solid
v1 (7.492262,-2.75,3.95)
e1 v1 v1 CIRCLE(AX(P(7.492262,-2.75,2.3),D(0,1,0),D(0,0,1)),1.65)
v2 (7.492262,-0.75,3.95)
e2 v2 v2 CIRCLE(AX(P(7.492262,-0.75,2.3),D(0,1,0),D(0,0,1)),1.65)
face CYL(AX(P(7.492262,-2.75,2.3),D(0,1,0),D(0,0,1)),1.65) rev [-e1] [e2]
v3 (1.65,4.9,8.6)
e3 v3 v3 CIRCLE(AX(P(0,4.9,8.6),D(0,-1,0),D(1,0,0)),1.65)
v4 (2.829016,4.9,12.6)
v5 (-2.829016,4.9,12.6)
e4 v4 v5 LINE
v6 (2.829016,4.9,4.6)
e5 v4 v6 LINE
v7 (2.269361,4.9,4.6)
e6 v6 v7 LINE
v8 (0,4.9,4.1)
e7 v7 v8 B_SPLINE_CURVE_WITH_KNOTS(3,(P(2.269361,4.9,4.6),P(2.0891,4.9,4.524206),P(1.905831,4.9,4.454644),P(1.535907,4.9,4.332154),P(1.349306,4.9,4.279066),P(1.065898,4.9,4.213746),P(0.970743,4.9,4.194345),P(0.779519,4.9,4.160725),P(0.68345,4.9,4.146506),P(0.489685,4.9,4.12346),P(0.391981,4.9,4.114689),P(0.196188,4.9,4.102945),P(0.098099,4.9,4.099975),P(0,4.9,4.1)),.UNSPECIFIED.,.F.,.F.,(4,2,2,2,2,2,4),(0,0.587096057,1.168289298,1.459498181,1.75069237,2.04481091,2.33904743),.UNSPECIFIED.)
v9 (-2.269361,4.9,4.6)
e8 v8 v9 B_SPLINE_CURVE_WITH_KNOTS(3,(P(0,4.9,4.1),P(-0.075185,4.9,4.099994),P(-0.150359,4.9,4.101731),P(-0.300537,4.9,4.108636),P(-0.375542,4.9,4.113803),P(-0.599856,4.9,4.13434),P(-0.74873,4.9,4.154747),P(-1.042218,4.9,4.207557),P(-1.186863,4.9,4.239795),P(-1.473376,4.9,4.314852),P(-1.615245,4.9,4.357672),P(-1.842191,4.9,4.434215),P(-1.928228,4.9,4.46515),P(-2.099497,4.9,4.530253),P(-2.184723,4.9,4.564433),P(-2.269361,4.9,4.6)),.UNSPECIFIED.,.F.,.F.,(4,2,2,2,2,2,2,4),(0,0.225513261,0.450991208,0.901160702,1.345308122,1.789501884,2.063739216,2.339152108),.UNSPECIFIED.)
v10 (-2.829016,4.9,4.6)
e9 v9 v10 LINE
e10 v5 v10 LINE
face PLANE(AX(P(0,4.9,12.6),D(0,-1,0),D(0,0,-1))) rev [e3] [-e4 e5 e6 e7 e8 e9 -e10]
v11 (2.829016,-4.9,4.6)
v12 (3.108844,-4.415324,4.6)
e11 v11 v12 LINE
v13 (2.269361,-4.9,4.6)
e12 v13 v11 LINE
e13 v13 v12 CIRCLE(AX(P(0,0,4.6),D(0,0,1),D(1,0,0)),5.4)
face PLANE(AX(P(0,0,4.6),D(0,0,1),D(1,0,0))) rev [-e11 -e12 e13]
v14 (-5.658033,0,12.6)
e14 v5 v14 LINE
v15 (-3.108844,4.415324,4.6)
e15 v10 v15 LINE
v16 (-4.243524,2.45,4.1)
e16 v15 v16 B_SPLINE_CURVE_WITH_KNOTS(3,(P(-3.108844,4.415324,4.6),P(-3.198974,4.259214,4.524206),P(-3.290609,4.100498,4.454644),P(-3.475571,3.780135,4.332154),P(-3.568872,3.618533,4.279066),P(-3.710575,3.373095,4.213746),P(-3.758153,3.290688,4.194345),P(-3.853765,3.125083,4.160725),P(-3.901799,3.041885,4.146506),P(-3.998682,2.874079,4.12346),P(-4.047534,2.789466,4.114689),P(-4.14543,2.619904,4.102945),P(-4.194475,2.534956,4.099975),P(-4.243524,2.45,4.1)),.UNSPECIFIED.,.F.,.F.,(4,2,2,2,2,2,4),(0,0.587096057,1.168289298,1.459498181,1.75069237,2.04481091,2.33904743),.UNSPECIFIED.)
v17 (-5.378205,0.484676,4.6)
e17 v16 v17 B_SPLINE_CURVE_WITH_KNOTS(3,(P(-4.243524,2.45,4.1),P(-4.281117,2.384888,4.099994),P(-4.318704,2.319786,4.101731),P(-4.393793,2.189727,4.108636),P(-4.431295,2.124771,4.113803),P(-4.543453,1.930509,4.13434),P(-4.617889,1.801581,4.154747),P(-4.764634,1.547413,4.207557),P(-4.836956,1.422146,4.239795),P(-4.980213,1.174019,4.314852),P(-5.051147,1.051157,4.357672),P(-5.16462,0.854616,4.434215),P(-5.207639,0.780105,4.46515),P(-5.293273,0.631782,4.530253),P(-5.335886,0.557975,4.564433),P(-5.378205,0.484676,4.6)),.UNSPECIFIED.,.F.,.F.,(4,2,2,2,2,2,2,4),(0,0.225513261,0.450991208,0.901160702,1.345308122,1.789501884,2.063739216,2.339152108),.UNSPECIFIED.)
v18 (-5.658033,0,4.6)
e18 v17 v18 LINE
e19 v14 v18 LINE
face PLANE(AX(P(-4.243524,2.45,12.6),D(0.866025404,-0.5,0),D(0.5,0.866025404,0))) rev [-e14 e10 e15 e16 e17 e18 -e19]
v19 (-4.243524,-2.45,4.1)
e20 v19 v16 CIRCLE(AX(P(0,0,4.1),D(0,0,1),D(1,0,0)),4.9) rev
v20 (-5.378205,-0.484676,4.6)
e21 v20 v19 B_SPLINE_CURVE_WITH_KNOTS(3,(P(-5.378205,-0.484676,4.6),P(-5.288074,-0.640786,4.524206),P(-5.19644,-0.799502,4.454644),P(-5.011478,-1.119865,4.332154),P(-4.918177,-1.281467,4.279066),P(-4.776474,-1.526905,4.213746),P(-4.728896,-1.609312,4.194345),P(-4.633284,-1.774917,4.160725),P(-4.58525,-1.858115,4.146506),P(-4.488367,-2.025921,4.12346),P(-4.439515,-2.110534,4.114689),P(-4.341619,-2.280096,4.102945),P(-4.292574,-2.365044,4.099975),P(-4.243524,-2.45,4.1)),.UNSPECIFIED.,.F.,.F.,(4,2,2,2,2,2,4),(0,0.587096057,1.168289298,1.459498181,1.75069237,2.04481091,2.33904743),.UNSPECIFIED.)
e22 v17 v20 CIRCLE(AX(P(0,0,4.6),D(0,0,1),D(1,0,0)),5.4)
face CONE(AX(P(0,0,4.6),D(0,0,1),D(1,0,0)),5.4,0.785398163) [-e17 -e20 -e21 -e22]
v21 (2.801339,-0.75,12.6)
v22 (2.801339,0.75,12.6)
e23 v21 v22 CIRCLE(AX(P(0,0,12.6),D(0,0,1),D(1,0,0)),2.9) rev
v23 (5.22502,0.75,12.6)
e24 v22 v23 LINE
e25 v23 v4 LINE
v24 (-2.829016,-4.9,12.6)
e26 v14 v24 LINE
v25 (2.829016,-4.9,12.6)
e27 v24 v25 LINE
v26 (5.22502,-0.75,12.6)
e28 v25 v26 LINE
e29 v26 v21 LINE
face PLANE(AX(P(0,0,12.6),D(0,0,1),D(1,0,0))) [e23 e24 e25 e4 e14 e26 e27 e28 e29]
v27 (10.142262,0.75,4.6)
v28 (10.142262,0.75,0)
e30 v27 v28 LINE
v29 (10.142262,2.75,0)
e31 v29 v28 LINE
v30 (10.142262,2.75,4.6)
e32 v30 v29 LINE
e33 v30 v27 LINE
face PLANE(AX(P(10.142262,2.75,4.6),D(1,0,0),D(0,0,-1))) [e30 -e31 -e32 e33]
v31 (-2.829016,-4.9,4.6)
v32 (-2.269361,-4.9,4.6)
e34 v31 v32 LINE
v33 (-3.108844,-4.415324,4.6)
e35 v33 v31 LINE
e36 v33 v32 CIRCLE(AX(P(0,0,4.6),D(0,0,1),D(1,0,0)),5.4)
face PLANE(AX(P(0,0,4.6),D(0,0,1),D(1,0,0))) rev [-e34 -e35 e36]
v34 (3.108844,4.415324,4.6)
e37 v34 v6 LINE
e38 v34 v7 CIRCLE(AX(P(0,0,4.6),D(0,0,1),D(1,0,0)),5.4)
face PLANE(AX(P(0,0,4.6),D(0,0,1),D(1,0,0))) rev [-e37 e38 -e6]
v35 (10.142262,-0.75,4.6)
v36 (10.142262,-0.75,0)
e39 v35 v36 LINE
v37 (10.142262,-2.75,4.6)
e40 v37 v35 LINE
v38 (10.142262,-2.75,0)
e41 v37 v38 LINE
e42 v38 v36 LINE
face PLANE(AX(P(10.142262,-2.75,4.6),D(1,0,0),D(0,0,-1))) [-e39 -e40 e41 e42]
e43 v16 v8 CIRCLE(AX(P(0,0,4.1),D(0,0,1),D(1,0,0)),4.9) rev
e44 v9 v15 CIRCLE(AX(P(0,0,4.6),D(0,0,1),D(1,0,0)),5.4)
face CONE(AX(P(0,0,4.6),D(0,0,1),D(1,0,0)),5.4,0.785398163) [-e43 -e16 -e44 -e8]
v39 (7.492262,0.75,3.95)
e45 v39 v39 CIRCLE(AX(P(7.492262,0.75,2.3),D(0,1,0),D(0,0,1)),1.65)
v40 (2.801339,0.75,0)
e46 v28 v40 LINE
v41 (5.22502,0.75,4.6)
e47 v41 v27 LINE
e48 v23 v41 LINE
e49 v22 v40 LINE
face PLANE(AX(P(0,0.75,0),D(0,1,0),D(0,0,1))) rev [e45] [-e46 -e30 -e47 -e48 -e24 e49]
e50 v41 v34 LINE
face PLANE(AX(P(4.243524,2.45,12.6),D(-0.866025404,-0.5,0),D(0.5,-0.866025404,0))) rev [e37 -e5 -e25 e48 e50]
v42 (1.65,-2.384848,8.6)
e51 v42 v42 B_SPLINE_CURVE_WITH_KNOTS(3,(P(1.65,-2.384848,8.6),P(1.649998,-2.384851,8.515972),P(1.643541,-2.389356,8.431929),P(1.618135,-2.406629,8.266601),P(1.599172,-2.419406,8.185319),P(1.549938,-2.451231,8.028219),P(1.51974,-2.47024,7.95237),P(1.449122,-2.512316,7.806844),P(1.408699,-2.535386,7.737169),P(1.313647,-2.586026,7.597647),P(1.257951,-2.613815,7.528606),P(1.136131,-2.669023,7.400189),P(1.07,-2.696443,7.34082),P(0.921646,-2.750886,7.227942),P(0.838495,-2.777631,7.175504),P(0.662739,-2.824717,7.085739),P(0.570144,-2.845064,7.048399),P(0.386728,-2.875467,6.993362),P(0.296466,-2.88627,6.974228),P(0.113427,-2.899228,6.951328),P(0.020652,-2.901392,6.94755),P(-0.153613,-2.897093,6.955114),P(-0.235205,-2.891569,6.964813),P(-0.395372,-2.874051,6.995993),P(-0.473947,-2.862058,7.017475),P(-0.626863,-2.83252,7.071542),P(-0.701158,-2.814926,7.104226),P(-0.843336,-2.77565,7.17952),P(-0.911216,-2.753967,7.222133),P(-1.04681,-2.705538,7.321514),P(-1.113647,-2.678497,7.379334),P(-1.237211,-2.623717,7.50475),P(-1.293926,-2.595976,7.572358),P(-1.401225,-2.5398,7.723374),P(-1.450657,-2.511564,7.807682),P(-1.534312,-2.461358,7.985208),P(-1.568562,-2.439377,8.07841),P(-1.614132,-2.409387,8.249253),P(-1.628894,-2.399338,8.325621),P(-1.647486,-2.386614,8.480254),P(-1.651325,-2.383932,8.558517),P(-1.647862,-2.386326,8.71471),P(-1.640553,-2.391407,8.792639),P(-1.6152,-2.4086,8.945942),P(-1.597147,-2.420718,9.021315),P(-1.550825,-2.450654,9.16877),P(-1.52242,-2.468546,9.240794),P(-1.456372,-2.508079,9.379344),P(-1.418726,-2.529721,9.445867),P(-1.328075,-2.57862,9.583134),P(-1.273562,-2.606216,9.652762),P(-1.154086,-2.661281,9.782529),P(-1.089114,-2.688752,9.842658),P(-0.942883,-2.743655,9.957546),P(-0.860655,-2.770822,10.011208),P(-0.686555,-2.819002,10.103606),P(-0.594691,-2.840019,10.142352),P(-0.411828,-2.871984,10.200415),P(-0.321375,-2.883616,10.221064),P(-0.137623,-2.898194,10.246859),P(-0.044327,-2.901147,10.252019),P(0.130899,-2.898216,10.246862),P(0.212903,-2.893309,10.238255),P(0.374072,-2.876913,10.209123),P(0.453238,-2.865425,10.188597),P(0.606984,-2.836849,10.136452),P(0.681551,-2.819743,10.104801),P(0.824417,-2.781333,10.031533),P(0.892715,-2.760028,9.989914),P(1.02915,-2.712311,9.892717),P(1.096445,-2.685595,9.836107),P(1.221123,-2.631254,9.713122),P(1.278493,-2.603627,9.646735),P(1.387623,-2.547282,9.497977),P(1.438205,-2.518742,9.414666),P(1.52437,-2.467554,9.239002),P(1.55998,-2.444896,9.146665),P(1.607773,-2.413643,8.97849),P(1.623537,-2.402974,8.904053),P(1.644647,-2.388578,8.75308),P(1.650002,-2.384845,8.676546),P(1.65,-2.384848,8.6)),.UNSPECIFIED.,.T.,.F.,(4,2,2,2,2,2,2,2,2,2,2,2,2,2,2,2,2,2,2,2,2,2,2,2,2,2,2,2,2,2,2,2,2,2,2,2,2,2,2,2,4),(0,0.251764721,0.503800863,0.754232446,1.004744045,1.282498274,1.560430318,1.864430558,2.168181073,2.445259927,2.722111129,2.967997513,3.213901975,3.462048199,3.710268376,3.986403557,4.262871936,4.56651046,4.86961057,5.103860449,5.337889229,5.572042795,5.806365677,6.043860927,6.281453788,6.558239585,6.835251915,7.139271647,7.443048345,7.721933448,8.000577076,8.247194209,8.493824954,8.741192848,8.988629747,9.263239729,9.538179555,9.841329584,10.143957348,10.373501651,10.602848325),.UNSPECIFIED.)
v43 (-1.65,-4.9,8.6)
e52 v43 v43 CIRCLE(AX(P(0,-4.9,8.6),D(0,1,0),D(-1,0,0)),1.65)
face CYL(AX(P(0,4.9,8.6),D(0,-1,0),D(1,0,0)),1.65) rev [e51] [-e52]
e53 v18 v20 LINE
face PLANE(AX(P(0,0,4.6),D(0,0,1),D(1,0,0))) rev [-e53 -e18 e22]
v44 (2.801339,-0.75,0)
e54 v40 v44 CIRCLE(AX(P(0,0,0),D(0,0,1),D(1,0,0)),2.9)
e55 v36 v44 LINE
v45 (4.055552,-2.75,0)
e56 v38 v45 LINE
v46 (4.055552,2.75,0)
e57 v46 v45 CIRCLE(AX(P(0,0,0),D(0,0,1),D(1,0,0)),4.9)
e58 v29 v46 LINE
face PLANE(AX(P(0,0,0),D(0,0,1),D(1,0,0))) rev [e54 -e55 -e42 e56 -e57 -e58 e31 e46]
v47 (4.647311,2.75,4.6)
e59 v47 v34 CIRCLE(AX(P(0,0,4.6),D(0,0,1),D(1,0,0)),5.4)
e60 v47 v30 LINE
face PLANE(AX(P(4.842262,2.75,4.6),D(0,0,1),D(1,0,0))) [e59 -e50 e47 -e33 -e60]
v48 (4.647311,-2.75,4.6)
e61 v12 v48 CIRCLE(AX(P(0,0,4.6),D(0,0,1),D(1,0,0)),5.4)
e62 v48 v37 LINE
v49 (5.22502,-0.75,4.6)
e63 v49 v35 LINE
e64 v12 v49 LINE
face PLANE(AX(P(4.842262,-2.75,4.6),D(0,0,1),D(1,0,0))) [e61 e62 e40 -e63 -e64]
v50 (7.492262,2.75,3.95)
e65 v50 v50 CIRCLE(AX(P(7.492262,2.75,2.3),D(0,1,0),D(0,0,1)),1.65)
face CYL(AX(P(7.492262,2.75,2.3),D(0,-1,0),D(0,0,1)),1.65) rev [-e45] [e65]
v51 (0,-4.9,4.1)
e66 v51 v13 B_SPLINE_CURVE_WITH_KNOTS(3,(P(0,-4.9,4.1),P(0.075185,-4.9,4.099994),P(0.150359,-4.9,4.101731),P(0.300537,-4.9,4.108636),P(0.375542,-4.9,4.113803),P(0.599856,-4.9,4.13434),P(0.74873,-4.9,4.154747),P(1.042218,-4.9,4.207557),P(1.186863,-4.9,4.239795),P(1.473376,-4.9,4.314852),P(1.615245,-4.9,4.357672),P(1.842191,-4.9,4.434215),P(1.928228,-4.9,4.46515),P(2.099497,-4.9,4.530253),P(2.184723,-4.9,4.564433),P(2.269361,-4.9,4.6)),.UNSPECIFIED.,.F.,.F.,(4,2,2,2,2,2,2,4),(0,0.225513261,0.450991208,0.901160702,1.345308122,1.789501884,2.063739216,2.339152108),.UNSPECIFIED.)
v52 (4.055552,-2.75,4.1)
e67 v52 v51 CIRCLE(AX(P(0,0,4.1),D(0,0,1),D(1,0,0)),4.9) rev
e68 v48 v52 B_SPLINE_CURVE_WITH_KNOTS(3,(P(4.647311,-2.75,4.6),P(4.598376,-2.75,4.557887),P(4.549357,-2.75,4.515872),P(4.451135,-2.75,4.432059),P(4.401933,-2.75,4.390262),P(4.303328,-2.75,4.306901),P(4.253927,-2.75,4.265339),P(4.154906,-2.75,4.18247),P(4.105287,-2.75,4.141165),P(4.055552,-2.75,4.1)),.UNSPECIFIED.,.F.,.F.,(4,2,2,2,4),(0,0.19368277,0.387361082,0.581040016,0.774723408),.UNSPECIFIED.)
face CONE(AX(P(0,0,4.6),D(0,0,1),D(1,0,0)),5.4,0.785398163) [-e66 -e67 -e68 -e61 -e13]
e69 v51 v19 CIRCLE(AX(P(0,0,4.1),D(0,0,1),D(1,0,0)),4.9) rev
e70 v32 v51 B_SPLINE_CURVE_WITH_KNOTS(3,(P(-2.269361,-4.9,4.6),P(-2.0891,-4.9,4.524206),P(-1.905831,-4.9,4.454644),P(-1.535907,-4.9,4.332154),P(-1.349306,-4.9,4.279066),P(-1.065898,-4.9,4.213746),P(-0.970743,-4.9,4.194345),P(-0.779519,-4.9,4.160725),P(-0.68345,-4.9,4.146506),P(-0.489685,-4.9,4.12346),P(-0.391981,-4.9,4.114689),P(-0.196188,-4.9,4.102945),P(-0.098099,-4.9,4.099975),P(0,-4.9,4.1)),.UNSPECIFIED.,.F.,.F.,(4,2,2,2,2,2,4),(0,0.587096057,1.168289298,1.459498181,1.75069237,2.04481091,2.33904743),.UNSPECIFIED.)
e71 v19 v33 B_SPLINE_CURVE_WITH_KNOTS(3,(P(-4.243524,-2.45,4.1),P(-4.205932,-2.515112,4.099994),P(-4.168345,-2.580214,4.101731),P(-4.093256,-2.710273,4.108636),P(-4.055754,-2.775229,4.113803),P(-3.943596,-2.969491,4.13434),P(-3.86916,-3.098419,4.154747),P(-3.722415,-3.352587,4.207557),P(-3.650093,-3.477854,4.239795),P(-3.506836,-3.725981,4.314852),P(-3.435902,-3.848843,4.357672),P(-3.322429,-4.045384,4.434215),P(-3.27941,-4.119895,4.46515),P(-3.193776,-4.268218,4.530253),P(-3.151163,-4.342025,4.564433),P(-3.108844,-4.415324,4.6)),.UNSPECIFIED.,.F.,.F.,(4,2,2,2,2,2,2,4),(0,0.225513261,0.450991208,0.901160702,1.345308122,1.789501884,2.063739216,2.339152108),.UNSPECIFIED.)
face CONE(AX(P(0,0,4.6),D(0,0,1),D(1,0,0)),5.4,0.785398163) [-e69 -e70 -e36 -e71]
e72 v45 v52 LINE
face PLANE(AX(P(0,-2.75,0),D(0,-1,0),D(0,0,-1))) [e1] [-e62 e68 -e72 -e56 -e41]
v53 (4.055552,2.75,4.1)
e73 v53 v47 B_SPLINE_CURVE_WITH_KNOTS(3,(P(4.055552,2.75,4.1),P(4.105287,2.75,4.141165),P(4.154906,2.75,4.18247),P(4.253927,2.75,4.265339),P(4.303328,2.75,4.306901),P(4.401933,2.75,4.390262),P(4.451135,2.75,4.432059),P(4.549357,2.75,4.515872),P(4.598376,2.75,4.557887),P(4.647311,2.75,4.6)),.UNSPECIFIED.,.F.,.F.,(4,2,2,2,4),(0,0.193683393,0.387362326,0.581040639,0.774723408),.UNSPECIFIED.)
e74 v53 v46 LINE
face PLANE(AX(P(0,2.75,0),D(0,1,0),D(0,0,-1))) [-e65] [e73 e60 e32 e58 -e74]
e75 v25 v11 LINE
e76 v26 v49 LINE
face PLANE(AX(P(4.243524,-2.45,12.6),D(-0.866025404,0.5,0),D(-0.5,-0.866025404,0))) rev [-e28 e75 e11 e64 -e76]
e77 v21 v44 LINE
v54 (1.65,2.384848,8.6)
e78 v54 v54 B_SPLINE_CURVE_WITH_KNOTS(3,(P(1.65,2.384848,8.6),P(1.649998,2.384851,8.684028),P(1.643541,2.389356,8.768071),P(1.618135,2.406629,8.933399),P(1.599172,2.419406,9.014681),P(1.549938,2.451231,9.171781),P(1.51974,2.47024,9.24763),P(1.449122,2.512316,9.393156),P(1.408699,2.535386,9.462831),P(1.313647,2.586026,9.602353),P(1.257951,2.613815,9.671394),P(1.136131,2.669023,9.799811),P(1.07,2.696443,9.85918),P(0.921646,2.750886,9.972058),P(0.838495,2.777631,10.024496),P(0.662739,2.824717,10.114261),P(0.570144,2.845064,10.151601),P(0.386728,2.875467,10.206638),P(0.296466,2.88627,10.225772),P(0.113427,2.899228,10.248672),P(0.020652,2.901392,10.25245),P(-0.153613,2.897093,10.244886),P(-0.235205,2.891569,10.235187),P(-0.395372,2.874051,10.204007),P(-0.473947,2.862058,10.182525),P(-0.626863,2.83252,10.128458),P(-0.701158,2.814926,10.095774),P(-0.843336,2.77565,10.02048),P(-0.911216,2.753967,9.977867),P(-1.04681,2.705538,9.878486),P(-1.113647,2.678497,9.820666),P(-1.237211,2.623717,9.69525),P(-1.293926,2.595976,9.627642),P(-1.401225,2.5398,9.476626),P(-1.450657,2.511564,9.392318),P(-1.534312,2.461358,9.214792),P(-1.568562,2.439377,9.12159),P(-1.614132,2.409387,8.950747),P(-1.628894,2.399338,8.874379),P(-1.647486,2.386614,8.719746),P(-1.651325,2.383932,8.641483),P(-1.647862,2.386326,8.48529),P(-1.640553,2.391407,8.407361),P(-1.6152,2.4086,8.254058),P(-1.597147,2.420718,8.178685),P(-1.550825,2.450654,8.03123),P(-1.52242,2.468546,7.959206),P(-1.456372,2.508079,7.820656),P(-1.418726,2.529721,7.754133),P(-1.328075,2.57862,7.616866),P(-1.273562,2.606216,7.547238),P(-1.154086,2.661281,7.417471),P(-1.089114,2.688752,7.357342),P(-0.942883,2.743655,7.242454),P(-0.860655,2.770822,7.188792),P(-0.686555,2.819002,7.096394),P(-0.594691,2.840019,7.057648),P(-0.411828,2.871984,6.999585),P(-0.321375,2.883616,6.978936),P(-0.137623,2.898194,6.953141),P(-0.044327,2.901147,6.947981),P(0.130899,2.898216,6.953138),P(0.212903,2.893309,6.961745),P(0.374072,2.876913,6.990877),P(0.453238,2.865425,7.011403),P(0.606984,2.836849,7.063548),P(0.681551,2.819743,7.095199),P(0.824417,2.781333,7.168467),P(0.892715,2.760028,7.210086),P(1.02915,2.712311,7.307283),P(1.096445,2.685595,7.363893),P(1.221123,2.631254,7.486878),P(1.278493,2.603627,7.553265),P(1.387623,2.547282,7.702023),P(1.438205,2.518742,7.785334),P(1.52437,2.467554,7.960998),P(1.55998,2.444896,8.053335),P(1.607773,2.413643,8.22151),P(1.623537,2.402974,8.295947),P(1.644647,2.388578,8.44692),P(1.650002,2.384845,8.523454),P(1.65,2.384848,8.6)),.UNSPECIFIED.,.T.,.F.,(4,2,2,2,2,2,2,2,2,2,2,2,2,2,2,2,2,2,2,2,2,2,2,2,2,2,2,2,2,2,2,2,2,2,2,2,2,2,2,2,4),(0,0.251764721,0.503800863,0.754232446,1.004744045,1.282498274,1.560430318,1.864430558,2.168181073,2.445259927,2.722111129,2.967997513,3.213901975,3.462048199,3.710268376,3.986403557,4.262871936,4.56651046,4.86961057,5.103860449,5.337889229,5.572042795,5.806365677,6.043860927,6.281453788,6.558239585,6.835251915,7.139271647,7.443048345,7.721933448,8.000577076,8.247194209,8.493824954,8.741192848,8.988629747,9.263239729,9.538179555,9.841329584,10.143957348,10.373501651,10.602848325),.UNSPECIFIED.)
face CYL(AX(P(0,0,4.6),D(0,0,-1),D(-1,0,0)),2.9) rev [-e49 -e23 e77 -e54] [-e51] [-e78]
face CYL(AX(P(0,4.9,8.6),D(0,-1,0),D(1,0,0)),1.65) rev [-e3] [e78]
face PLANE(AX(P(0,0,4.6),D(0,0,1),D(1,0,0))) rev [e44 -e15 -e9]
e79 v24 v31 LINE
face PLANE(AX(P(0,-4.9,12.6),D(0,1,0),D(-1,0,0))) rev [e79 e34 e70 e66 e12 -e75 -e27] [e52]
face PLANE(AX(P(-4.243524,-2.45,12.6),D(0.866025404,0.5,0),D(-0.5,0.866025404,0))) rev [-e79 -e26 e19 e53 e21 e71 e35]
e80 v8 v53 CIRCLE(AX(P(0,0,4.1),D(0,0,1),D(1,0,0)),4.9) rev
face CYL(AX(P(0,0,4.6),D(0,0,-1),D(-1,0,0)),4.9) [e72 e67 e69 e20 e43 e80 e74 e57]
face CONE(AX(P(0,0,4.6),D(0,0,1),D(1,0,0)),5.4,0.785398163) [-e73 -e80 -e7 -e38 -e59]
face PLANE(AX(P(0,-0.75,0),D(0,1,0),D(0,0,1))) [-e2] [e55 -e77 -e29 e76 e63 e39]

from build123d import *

# Parameters (mm, degrees)
CROQUIS1_R                 = 4.9
CROQUIS1_R_2               = 2.9
SALIENTE_EXTRUIR1_DEPTH    = 4.6
CORTAR_EXTRUIR2_DEPTH      = 0.75
CORTAR_EXTRUIR2_DEPTH_BACK = 0.75
CROQUIS2_W                 = 2.8
CROQUIS2_H                 = 4.6
CROQUIS4_R                 = 1.65
SALIENTE_EXTRUIR2_DEPTH    = 2
SALIENTE_EXTRUIR3_DEPTH    = 8
CORTAR_EXTRUIR3_DEPTH      = 19.912045786
CORTAR_EXTRUIR3_DEPTH_BACK = 19.912045786
CROQUIS6_R                 = 1.65
CHAFL_N1_SIZE              = 0.5


with BuildPart() as part:
    # Croquis1 → Saliente-Extruir1 (new body)
    with BuildSketch(Plane.XY):
        Circle(CROQUIS1_R)
        Circle(CROQUIS1_R_2, mode=Mode.SUBTRACT)
    extrude(amount=SALIENTE_EXTRUIR1_DEPTH)

    # Croquis2 → Cortar-Extruir2 (cut, two sides: drawn at the far end of the back side and taken through both)
    with BuildSketch(Plane(origin=(0, 0, 0), x_dir=(1, 0, 0), z_dir=(0, 1, 0)).offset(-CORTAR_EXTRUIR2_DEPTH_BACK)):
        with Locations((3.6, -2.3)):
            Rectangle(CROQUIS2_W, CROQUIS2_H)
    extrude(amount=CORTAR_EXTRUIR2_DEPTH + CORTAR_EXTRUIR2_DEPTH_BACK, mode=Mode.SUBTRACT)



with BuildPart() as body_2:
    # Croquis4 → Saliente-Extruir2 (new body)
    with BuildSketch(Plane(origin=(0, -0.75, 0), x_dir=(1, 0, 0), z_dir=(0, 1, 0))):
        Polygon((4.842261868, -4.6), (10.142261868, -4.6), (10.142261868, 0), (4.842261868, 0), (2.801338966, 0), (2.801338966, -4.6), align=None)
        with Locations(Location((7.492261868, -2.3, 0), (0, 0, 270))):
            Circle(CROQUIS4_R, mode=Mode.SUBTRACT)
    extrude(amount=-SALIENTE_EXTRUIR2_DEPTH)


with BuildPart() as body_3:
    # Simetría3: mirrored copy
    add(body_2.part.mirror(Plane.ZX))


with BuildPart() as part_1:
    add(part.part)

    add(body_2.part)  # Saliente-Extruir3 merges body 2

    add(body_3.part)  # Saliente-Extruir3 merges body 3
    # Croquis5 → Saliente-Extruir3 (add)
    with BuildSketch(Plane.XY.offset(4.6)):
        with BuildLine():
            ThreePointArc((2.801338966, -0.75), (-2.9, 0), (2.801338966, 0.75))
            Line((2.801338966, 0.75), (4.842261868, 0.75))
            ThreePointArc((4.842261868, 0.75), (-4.9, 0), (4.842261868, -0.75))
            Line((4.842261868, -0.75), (2.801338966, -0.75))
        make_face()
        with BuildLine():
            Line((-2.829016319, 4.9), (-4.243524531, 2.449999908))
            ThreePointArc((-4.243524531, 2.449999908), (-2.450000051, 4.243524449), (-1.2e-08, 4.9))
            Line((-1.2e-08, 4.9), (-2.829016319, 4.9))
        make_face()
        with BuildLine():
            Line((-5.658032638, 0), (-4.243524553, -2.449999871))
            ThreePointArc((-4.243524553, -2.449999871), (-4.9, 2.1e-08), (-4.243524531, 2.449999908))
            Line((-4.243524531, 2.449999908), (-5.658032638, 0))
        make_face()
        with BuildLine():
            Line((-2.829016319, -4.9), (-1.5e-08, -4.9))
            ThreePointArc((-1.5e-08, -4.9), (-2.450000071, -4.243524438), (-4.243524553, -2.449999871))
            Line((-4.243524553, -2.449999871), (-2.829016319, -4.9))
        make_face()
        with BuildLine():
            Line((-1.5e-08, -4.9), (2.829016319, -4.9))
            Line((2.829016319, -4.9), (4.24352445, -2.45000005))
            ThreePointArc((4.24352445, -2.45000005), (2.449999969, -4.243524497), (-1.5e-08, -4.9))
        make_face()
        with BuildLine():
            Line((2.829016319, 4.9), (-1.2e-08, 4.9))
            ThreePointArc((-1.2e-08, 4.9), (2.450000039, 4.243524456), (4.243524529, 2.449999913))
            Line((4.243524529, 2.449999913), (2.829016319, 4.9))
        make_face()
        with BuildLine():
            Line((4.842261868, 0.75), (5.225019936, 0.75))
            Line((5.225019936, 0.75), (4.243524529, 2.449999913))
            ThreePointArc((4.243524529, 2.449999913), (4.621728956, 1.627765788), (4.842261868, 0.75))
        make_face()
        with BuildLine():
            ThreePointArc((4.842261868, -0.75), (4.621728929, -1.627765863), (4.24352445, -2.45000005))
            Line((4.24352445, -2.45000005), (5.225019936, -0.75))
            Line((5.225019936, -0.75), (4.842261868, -0.75))
        make_face()
    extrude(amount=SALIENTE_EXTRUIR3_DEPTH)

    # Croquis6 → Cortar-Extruir3 (cut, two sides: drawn at the far end of the back side and taken through both)
    with BuildSketch(Plane.XZ.offset(4.9).offset(-CORTAR_EXTRUIR3_DEPTH_BACK)):
        with Locations((0, 8.6)):
            Circle(CROQUIS6_R)
    extrude(amount=CORTAR_EXTRUIR3_DEPTH + CORTAR_EXTRUIR3_DEPTH_BACK, mode=Mode.SUBTRACT)

    # Chaflán1
    # the kernel refuses this chamfer: 0.5 mm, written as the material it adds along each edge
    with BuildSketch(Plane(origin=(0, 0, 4.6), x_dir=(0, 1, 0), z_dir=(1, 0, 0))) as chafl_n1_piece_1_section:
        Polygon((4.9 + CHAFL_N1_SIZE, 0), (4.9, -CHAFL_N1_SIZE), (4.9, 0), align=None)
    chafl_n1_piece_1 = revolve(axis=Axis((0, 0, 4.6), (0, 0, 1)), revolution_arc=59.999998828, mode=Mode.PRIVATE)
    chafl_n1_piece_1 = split(chafl_n1_piece_1, bisect_by=Plane(origin=(-2.470137352, 4.9, 4.415231156), z_dir=(0, -1, 0)), keep=Keep.TOP, mode=Mode.PRIVATE)
    chafl_n1_piece_1 = split(chafl_n1_piece_1, bisect_by=Plane(origin=(-3.008455802, 4.589201698, 4.415231156), z_dir=(0.8660254037844386, -0.5000000000000002, 0)), keep=Keep.TOP, mode=Mode.PRIVATE)
    add(chafl_n1_piece_1)
    with BuildSketch(Plane(origin=(0, 0, 4.6), x_dir=(-0.8660253935532619, 0.5000000177209175, 0), z_dir=(0.5000000177209175, 0.8660253935532619, 0))) as chafl_n1_piece_2_section:
        Polygon((4.9 + CHAFL_N1_SIZE, 0), (4.9, -CHAFL_N1_SIZE), (4.9, 0), align=None)
    chafl_n1_piece_2 = revolve(axis=Axis((0, 0, 4.6), (0, 0, 1)), revolution_arc=59.99999929, mode=Mode.PRIVATE)
    chafl_n1_piece_2 = split(chafl_n1_piece_2, bisect_by=Plane(origin=(-5.478593155, 0.310798302, 4.415231156), z_dir=(0.8660254037844386, -0.5000000000000002, 0)), keep=Keep.TOP, mode=Mode.PRIVATE)
    chafl_n1_piece_2 = split(chafl_n1_piece_2, bisect_by=Plane(origin=(-5.478593155, -0.310798302, 4.415231156), z_dir=(0.8660254037844386, 0.5000000000000002, 0)), keep=Keep.TOP, mode=Mode.PRIVATE)
    add(chafl_n1_piece_2)
    with BuildSketch(Plane(origin=(0, 0, 4.6), x_dir=(-0.8660254202095417, -0.4999999715508861, 0), z_dir=(-0.4999999715508861, 0.8660254202095417, 0))) as chafl_n1_piece_3_section:
        Polygon((4.9 + CHAFL_N1_SIZE, 0), (4.9, -CHAFL_N1_SIZE), (4.9, 0), align=None)
    chafl_n1_piece_3 = revolve(axis=Axis((0, 0, 4.6), (0, 0, 1)), revolution_arc=60.000001882, mode=Mode.PRIVATE)
    chafl_n1_piece_3 = split(chafl_n1_piece_3, bisect_by=Plane(origin=(-3.008455802, -4.589201698, 4.415231156), z_dir=(0.8660254037844386, 0.5000000000000002, 0)), keep=Keep.TOP, mode=Mode.PRIVATE)
    chafl_n1_piece_3 = split(chafl_n1_piece_3, bisect_by=Plane(origin=(-2.470137352, -4.9, 4.415231156), z_dir=(0, 1, 0)), keep=Keep.TOP, mode=Mode.PRIVATE)
    add(chafl_n1_piece_3)
    with BuildSketch(Plane(origin=(0, 0, 4.6), x_dir=(0, -1, 0), z_dir=(-1, 0, 0))) as chafl_n1_piece_4_section:
        Polygon((4.9 + CHAFL_N1_SIZE, 0), (4.9, -CHAFL_N1_SIZE), (4.9, 0), align=None)
    chafl_n1_piece_4 = revolve(axis=Axis((0, 0, 4.6), (0, 0, 1)), revolution_arc=70.897169979, mode=Mode.PRIVATE)
    chafl_n1_piece_4 = split(chafl_n1_piece_4, bisect_by=Plane(origin=(2.466837368, -4.9, 4.415358811), z_dir=(0, 1, 0)), keep=Keep.TOP, mode=Mode.PRIVATE)
    add(chafl_n1_piece_4)
    with BuildSketch(Plane(origin=(0, 0, 4.6), x_dir=(0.9449327486717788, 0.3272645726130418, 0), z_dir=(0.3272645726130418, -0.9449327486717788, 0))) as chafl_n1_piece_5_section:
        Polygon((4.9 + CHAFL_N1_SIZE, 0), (4.9, -CHAFL_N1_SIZE), (4.9, 0), align=None)
    chafl_n1_piece_5 = revolve(axis=Axis((0, 0, 4.6), (0, 0, 1)), revolution_arc=70.897169979, mode=Mode.PRIVATE)
    chafl_n1_piece_5 = split(chafl_n1_piece_5, bisect_by=Plane(origin=(3.940959453, 4.9, 4.468069459), z_dir=(0, -1, 0)), keep=Keep.TOP, mode=Mode.PRIVATE)
    add(chafl_n1_piece_5)


solid = part_1.part
